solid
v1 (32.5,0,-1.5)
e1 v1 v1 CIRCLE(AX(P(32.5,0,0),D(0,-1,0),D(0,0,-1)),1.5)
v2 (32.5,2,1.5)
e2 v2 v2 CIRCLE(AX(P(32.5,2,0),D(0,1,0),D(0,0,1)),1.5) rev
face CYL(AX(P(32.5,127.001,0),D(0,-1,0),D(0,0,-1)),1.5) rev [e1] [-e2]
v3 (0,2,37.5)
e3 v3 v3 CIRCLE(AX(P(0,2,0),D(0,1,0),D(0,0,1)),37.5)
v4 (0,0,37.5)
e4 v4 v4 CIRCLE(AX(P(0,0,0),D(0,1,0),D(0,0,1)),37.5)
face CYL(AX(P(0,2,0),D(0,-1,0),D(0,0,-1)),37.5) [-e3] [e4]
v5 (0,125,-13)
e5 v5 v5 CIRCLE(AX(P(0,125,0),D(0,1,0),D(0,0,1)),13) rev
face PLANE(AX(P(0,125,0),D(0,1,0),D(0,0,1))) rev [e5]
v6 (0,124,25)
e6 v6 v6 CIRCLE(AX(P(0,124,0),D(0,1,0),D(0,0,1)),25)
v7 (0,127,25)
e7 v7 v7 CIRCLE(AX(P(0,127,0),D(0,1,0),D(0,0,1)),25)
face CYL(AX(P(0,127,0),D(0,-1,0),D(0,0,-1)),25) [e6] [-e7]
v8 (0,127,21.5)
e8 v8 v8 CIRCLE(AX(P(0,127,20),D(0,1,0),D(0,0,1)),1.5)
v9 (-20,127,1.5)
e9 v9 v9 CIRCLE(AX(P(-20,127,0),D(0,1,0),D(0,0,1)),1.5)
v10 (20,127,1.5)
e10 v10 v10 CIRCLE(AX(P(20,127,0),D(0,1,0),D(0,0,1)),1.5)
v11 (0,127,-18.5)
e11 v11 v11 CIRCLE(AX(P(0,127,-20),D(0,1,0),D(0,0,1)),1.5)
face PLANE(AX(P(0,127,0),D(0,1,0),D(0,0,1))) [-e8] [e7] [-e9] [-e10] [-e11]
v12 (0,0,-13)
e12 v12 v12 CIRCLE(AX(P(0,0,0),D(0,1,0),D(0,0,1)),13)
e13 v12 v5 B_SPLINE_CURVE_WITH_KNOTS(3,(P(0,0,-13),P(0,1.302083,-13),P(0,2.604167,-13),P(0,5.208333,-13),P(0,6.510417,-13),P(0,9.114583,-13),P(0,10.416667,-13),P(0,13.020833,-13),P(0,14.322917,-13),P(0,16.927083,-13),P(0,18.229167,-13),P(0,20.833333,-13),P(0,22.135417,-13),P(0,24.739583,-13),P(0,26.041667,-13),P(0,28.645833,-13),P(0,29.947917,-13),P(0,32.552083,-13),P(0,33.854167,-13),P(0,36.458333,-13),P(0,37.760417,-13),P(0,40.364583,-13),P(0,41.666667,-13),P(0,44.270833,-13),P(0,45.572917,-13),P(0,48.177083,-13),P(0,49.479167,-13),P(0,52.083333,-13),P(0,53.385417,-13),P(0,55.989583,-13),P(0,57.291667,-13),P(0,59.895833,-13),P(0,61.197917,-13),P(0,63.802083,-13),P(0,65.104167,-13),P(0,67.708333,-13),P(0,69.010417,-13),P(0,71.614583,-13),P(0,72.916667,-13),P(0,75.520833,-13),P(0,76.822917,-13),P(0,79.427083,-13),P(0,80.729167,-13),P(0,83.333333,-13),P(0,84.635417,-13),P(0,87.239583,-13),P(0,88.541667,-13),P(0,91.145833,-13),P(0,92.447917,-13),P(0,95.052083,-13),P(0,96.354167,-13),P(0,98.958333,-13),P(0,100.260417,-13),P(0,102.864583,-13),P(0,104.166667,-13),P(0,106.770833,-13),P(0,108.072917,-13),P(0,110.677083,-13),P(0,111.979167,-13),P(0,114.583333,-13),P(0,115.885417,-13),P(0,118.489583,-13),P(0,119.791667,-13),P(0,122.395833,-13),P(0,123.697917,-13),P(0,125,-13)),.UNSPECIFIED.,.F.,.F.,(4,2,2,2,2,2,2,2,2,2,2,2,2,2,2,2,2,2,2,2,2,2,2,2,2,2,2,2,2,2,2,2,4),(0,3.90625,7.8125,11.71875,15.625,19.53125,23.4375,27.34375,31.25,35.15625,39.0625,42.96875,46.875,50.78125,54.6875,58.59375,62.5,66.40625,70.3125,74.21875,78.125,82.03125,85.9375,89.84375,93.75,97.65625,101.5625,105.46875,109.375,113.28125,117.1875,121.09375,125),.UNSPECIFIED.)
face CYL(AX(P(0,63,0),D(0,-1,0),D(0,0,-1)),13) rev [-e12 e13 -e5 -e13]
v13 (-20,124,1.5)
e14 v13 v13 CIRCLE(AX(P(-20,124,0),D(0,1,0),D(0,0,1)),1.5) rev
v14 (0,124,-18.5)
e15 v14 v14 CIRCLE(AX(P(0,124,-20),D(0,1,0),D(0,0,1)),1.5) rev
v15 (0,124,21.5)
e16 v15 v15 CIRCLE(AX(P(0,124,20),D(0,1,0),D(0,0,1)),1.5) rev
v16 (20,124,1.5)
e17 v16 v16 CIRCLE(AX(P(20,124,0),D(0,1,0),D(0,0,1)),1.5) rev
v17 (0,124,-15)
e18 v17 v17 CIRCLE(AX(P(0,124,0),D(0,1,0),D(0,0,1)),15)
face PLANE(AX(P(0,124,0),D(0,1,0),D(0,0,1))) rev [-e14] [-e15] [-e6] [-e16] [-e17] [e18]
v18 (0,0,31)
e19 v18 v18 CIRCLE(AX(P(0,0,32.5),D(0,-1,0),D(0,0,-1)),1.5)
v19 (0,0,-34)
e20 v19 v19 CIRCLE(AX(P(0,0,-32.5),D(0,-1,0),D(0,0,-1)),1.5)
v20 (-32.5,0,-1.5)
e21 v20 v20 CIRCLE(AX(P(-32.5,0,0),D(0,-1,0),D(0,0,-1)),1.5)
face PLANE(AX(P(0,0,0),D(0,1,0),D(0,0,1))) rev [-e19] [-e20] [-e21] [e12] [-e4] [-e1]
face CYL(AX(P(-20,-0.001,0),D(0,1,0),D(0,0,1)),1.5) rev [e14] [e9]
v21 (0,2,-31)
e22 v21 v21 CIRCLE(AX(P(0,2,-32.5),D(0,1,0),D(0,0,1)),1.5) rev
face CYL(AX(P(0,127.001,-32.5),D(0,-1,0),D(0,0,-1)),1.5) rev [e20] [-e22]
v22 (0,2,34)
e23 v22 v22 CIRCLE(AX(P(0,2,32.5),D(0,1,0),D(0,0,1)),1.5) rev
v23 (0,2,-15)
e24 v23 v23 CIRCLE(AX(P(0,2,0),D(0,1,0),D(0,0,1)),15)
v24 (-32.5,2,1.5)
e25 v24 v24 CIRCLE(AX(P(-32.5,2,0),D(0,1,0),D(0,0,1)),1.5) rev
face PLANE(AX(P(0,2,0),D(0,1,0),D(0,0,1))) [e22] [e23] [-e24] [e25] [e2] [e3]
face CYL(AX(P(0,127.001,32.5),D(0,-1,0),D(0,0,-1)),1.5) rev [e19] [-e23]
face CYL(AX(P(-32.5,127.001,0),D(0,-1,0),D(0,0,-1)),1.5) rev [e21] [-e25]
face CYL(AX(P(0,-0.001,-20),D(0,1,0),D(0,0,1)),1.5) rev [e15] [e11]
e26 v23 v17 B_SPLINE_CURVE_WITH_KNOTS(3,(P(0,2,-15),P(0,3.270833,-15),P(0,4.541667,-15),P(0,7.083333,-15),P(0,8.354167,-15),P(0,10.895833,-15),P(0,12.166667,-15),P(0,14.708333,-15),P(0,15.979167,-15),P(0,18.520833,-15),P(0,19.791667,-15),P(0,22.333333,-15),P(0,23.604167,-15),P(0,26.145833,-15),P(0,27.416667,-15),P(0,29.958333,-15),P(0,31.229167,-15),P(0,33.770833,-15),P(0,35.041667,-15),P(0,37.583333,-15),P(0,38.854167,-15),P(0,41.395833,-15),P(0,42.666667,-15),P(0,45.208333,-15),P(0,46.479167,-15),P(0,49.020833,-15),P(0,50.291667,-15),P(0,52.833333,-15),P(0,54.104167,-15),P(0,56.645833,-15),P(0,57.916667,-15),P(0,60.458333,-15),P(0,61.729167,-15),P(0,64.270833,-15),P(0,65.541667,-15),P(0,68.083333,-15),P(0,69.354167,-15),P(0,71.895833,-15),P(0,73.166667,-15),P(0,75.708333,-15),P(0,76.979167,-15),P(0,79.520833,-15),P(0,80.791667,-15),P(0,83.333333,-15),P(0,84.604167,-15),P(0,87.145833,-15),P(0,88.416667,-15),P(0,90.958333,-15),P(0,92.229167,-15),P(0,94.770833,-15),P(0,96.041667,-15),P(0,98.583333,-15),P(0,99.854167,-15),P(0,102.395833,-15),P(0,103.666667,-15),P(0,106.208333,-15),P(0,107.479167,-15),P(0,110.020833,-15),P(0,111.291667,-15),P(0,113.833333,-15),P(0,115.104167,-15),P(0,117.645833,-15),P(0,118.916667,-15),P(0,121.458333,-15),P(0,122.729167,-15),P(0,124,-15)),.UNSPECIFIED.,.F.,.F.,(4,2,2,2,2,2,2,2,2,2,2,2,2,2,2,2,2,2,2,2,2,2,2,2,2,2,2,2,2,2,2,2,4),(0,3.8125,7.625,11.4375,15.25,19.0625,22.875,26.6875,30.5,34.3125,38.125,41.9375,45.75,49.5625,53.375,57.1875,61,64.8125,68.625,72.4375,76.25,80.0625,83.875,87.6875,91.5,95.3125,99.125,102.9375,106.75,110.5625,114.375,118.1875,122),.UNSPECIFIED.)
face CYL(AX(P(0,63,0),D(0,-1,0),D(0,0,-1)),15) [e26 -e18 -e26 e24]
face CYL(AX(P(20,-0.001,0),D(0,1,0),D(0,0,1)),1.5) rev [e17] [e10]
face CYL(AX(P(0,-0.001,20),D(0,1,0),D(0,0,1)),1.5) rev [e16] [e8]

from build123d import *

# Parameters (mm, degrees)
SKETCH2_R           = 37.5
BOSS_EXTRUDE1_DEPTH = 2
SKETCH4_R           = 15
BOSS_EXTRUDE2_DEPTH = 61
SKETCH5_R           = 25
BOSS_EXTRUDE3_DEPTH = 3
CUT_EXTRUDE1_REACH  = 139.628
SKETCH6_R           = 1.5
CUT_EXTRUDE2_REACH  = 139.628
SKETCH7_R           = 1.5
SHELL1_OUTLINE_R    = 13
SHELL1_DEPTH        = 125


# Read off the part's stored shape, not the designer's step: Shell1
with BuildPart() as part:
    # Sketch2 → Boss-Extrude1 (new body)
    with BuildSketch(Plane(origin=(0, 0, 0), x_dir=(1, 0, 0), z_dir=(0, 1, 0))):
        with Locations(Location((0, 0, 0), (0, 0, 270))):
            Circle(SKETCH2_R)
    extrude(amount=BOSS_EXTRUDE1_DEPTH)

    # Sketch4 → Boss-Extrude2 (add)
    with BuildSketch(Plane(origin=(0, 2, 0), x_dir=(1, 0, 0), z_dir=(0, 1, 0))):
        with Locations(Location((0, 0, 0), (0, 0, 90))):
            Circle(SKETCH4_R)
    boss_extrude2 = extrude(amount=BOSS_EXTRUDE2_DEPTH)

    # Mirror1: Boss-Extrude2 across plane
    add(boss_extrude2.mirror(Plane.ZX.offset(63)))

    # Sketch5 → Boss-Extrude3 (add)
    with BuildSketch(Plane(origin=(0, 124, 0), x_dir=(1, 0, 0), z_dir=(0, 1, 0))):
        with Locations(Location((0, 0, 0), (0, 0, 270))):
            Circle(SKETCH5_R)
    extrude(amount=BOSS_EXTRUDE3_DEPTH)

    # Sketch6 → Cut-Extrude1 (cut, up to next)
    with BuildSketch(Plane(origin=(0, 127, 0), x_dir=(1, 0, 0), z_dir=(0, 1, 0)), mode=Mode.PRIVATE) as cut_extrude1_sk1:
        with Locations(Location((0, 20, 0), (0, 0, 270))):
            Circle(SKETCH6_R)
    cut_extrude1_tool1 = extrude(cut_extrude1_sk1.sketch, amount=-CUT_EXTRUDE1_REACH, mode=Mode.PRIVATE) & part.part
    # Sketch6 → Cut-Extrude1 (cut, up to next)
    with BuildSketch(Plane(origin=(0, 127, 0), x_dir=(1, 0, 0), z_dir=(0, 1, 0)), mode=Mode.PRIVATE) as cut_extrude1_sk2:
        with Locations(Location((20, 0, 0), (0, 0, 270))):
            Circle(SKETCH6_R)
    cut_extrude1_tool2 = extrude(cut_extrude1_sk2.sketch, amount=-CUT_EXTRUDE1_REACH, mode=Mode.PRIVATE) & part.part
    # Sketch6 → Cut-Extrude1 (cut, up to next)
    with BuildSketch(Plane(origin=(0, 127, 0), x_dir=(1, 0, 0), z_dir=(0, 1, 0)), mode=Mode.PRIVATE) as cut_extrude1_sk3:
        with Locations(Location((0, -20, 0), (0, 0, 270))):
            Circle(SKETCH6_R)
    cut_extrude1_tool3 = extrude(cut_extrude1_sk3.sketch, amount=-CUT_EXTRUDE1_REACH, mode=Mode.PRIVATE) & part.part
    # Sketch6 → Cut-Extrude1 (cut, up to next)
    with BuildSketch(Plane(origin=(0, 127, 0), x_dir=(1, 0, 0), z_dir=(0, 1, 0)), mode=Mode.PRIVATE) as cut_extrude1_sk4:
        with Locations(Location((-20, 0, 0), (0, 0, 270))):
            Circle(SKETCH6_R)
    cut_extrude1_tool4 = extrude(cut_extrude1_sk4.sketch, amount=-CUT_EXTRUDE1_REACH, mode=Mode.PRIVATE) & part.part
    add(cut_extrude1_tool1.solids().sort_by_distance((0, 127, -20))[0], mode=Mode.SUBTRACT)
    add(cut_extrude1_tool2.solids().sort_by_distance((20, 127, 0))[0], mode=Mode.SUBTRACT)
    add(cut_extrude1_tool3.solids().sort_by_distance((0, 127, 20))[0], mode=Mode.SUBTRACT)
    add(cut_extrude1_tool4.solids().sort_by_distance((-20, 127, 0))[0], mode=Mode.SUBTRACT)

    # Sketch7 → Cut-Extrude2 (cut, up to next)
    with BuildSketch(Plane.XZ, mode=Mode.PRIVATE) as cut_extrude2_sk1:
        with Locations(Location((0, 32.5, 0), (0, 0, 270))):
            Circle(SKETCH7_R)
    cut_extrude2_tool1 = extrude(cut_extrude2_sk1.sketch, amount=-CUT_EXTRUDE2_REACH, mode=Mode.PRIVATE) & part.part
    # Sketch7 → Cut-Extrude2 (cut, up to next)
    with BuildSketch(Plane.XZ, mode=Mode.PRIVATE) as cut_extrude2_sk2:
        with Locations(Location((32.5, 0, 0), (0, 0, 270))):
            Circle(SKETCH7_R)
    cut_extrude2_tool2 = extrude(cut_extrude2_sk2.sketch, amount=-CUT_EXTRUDE2_REACH, mode=Mode.PRIVATE) & part.part
    # Sketch7 → Cut-Extrude2 (cut, up to next)
    with BuildSketch(Plane.XZ, mode=Mode.PRIVATE) as cut_extrude2_sk3:
        with Locations(Location((0, -32.5, 0), (0, 0, 270))):
            Circle(SKETCH7_R)
    cut_extrude2_tool3 = extrude(cut_extrude2_sk3.sketch, amount=-CUT_EXTRUDE2_REACH, mode=Mode.PRIVATE) & part.part
    # Sketch7 → Cut-Extrude2 (cut, up to next)
    with BuildSketch(Plane.XZ, mode=Mode.PRIVATE) as cut_extrude2_sk4:
        with Locations(Location((-32.5, 0, 0), (0, 0, 270))):
            Circle(SKETCH7_R)
    cut_extrude2_tool4 = extrude(cut_extrude2_sk4.sketch, amount=-CUT_EXTRUDE2_REACH, mode=Mode.PRIVATE) & part.part
    add(cut_extrude2_tool1.solids().sort_by_distance((0, 0, 32.5))[0], mode=Mode.SUBTRACT)
    add(cut_extrude2_tool2.solids().sort_by_distance((32.5, 0, 0))[0], mode=Mode.SUBTRACT)
    add(cut_extrude2_tool3.solids().sort_by_distance((0, 0, -32.5))[0], mode=Mode.SUBTRACT)
    add(cut_extrude2_tool4.solids().sort_by_distance((-32.5, 0, 0))[0], mode=Mode.SUBTRACT)

    # Shell1 outline → Shell1 (cut)
    with BuildSketch(Plane(origin=(0, 0, 0), x_dir=(1, 0, 0), z_dir=(0, 1, 0))):
        Circle(SHELL1_OUTLINE_R)
    extrude(amount=SHELL1_DEPTH, mode=Mode.SUBTRACT)


solid = part.part
